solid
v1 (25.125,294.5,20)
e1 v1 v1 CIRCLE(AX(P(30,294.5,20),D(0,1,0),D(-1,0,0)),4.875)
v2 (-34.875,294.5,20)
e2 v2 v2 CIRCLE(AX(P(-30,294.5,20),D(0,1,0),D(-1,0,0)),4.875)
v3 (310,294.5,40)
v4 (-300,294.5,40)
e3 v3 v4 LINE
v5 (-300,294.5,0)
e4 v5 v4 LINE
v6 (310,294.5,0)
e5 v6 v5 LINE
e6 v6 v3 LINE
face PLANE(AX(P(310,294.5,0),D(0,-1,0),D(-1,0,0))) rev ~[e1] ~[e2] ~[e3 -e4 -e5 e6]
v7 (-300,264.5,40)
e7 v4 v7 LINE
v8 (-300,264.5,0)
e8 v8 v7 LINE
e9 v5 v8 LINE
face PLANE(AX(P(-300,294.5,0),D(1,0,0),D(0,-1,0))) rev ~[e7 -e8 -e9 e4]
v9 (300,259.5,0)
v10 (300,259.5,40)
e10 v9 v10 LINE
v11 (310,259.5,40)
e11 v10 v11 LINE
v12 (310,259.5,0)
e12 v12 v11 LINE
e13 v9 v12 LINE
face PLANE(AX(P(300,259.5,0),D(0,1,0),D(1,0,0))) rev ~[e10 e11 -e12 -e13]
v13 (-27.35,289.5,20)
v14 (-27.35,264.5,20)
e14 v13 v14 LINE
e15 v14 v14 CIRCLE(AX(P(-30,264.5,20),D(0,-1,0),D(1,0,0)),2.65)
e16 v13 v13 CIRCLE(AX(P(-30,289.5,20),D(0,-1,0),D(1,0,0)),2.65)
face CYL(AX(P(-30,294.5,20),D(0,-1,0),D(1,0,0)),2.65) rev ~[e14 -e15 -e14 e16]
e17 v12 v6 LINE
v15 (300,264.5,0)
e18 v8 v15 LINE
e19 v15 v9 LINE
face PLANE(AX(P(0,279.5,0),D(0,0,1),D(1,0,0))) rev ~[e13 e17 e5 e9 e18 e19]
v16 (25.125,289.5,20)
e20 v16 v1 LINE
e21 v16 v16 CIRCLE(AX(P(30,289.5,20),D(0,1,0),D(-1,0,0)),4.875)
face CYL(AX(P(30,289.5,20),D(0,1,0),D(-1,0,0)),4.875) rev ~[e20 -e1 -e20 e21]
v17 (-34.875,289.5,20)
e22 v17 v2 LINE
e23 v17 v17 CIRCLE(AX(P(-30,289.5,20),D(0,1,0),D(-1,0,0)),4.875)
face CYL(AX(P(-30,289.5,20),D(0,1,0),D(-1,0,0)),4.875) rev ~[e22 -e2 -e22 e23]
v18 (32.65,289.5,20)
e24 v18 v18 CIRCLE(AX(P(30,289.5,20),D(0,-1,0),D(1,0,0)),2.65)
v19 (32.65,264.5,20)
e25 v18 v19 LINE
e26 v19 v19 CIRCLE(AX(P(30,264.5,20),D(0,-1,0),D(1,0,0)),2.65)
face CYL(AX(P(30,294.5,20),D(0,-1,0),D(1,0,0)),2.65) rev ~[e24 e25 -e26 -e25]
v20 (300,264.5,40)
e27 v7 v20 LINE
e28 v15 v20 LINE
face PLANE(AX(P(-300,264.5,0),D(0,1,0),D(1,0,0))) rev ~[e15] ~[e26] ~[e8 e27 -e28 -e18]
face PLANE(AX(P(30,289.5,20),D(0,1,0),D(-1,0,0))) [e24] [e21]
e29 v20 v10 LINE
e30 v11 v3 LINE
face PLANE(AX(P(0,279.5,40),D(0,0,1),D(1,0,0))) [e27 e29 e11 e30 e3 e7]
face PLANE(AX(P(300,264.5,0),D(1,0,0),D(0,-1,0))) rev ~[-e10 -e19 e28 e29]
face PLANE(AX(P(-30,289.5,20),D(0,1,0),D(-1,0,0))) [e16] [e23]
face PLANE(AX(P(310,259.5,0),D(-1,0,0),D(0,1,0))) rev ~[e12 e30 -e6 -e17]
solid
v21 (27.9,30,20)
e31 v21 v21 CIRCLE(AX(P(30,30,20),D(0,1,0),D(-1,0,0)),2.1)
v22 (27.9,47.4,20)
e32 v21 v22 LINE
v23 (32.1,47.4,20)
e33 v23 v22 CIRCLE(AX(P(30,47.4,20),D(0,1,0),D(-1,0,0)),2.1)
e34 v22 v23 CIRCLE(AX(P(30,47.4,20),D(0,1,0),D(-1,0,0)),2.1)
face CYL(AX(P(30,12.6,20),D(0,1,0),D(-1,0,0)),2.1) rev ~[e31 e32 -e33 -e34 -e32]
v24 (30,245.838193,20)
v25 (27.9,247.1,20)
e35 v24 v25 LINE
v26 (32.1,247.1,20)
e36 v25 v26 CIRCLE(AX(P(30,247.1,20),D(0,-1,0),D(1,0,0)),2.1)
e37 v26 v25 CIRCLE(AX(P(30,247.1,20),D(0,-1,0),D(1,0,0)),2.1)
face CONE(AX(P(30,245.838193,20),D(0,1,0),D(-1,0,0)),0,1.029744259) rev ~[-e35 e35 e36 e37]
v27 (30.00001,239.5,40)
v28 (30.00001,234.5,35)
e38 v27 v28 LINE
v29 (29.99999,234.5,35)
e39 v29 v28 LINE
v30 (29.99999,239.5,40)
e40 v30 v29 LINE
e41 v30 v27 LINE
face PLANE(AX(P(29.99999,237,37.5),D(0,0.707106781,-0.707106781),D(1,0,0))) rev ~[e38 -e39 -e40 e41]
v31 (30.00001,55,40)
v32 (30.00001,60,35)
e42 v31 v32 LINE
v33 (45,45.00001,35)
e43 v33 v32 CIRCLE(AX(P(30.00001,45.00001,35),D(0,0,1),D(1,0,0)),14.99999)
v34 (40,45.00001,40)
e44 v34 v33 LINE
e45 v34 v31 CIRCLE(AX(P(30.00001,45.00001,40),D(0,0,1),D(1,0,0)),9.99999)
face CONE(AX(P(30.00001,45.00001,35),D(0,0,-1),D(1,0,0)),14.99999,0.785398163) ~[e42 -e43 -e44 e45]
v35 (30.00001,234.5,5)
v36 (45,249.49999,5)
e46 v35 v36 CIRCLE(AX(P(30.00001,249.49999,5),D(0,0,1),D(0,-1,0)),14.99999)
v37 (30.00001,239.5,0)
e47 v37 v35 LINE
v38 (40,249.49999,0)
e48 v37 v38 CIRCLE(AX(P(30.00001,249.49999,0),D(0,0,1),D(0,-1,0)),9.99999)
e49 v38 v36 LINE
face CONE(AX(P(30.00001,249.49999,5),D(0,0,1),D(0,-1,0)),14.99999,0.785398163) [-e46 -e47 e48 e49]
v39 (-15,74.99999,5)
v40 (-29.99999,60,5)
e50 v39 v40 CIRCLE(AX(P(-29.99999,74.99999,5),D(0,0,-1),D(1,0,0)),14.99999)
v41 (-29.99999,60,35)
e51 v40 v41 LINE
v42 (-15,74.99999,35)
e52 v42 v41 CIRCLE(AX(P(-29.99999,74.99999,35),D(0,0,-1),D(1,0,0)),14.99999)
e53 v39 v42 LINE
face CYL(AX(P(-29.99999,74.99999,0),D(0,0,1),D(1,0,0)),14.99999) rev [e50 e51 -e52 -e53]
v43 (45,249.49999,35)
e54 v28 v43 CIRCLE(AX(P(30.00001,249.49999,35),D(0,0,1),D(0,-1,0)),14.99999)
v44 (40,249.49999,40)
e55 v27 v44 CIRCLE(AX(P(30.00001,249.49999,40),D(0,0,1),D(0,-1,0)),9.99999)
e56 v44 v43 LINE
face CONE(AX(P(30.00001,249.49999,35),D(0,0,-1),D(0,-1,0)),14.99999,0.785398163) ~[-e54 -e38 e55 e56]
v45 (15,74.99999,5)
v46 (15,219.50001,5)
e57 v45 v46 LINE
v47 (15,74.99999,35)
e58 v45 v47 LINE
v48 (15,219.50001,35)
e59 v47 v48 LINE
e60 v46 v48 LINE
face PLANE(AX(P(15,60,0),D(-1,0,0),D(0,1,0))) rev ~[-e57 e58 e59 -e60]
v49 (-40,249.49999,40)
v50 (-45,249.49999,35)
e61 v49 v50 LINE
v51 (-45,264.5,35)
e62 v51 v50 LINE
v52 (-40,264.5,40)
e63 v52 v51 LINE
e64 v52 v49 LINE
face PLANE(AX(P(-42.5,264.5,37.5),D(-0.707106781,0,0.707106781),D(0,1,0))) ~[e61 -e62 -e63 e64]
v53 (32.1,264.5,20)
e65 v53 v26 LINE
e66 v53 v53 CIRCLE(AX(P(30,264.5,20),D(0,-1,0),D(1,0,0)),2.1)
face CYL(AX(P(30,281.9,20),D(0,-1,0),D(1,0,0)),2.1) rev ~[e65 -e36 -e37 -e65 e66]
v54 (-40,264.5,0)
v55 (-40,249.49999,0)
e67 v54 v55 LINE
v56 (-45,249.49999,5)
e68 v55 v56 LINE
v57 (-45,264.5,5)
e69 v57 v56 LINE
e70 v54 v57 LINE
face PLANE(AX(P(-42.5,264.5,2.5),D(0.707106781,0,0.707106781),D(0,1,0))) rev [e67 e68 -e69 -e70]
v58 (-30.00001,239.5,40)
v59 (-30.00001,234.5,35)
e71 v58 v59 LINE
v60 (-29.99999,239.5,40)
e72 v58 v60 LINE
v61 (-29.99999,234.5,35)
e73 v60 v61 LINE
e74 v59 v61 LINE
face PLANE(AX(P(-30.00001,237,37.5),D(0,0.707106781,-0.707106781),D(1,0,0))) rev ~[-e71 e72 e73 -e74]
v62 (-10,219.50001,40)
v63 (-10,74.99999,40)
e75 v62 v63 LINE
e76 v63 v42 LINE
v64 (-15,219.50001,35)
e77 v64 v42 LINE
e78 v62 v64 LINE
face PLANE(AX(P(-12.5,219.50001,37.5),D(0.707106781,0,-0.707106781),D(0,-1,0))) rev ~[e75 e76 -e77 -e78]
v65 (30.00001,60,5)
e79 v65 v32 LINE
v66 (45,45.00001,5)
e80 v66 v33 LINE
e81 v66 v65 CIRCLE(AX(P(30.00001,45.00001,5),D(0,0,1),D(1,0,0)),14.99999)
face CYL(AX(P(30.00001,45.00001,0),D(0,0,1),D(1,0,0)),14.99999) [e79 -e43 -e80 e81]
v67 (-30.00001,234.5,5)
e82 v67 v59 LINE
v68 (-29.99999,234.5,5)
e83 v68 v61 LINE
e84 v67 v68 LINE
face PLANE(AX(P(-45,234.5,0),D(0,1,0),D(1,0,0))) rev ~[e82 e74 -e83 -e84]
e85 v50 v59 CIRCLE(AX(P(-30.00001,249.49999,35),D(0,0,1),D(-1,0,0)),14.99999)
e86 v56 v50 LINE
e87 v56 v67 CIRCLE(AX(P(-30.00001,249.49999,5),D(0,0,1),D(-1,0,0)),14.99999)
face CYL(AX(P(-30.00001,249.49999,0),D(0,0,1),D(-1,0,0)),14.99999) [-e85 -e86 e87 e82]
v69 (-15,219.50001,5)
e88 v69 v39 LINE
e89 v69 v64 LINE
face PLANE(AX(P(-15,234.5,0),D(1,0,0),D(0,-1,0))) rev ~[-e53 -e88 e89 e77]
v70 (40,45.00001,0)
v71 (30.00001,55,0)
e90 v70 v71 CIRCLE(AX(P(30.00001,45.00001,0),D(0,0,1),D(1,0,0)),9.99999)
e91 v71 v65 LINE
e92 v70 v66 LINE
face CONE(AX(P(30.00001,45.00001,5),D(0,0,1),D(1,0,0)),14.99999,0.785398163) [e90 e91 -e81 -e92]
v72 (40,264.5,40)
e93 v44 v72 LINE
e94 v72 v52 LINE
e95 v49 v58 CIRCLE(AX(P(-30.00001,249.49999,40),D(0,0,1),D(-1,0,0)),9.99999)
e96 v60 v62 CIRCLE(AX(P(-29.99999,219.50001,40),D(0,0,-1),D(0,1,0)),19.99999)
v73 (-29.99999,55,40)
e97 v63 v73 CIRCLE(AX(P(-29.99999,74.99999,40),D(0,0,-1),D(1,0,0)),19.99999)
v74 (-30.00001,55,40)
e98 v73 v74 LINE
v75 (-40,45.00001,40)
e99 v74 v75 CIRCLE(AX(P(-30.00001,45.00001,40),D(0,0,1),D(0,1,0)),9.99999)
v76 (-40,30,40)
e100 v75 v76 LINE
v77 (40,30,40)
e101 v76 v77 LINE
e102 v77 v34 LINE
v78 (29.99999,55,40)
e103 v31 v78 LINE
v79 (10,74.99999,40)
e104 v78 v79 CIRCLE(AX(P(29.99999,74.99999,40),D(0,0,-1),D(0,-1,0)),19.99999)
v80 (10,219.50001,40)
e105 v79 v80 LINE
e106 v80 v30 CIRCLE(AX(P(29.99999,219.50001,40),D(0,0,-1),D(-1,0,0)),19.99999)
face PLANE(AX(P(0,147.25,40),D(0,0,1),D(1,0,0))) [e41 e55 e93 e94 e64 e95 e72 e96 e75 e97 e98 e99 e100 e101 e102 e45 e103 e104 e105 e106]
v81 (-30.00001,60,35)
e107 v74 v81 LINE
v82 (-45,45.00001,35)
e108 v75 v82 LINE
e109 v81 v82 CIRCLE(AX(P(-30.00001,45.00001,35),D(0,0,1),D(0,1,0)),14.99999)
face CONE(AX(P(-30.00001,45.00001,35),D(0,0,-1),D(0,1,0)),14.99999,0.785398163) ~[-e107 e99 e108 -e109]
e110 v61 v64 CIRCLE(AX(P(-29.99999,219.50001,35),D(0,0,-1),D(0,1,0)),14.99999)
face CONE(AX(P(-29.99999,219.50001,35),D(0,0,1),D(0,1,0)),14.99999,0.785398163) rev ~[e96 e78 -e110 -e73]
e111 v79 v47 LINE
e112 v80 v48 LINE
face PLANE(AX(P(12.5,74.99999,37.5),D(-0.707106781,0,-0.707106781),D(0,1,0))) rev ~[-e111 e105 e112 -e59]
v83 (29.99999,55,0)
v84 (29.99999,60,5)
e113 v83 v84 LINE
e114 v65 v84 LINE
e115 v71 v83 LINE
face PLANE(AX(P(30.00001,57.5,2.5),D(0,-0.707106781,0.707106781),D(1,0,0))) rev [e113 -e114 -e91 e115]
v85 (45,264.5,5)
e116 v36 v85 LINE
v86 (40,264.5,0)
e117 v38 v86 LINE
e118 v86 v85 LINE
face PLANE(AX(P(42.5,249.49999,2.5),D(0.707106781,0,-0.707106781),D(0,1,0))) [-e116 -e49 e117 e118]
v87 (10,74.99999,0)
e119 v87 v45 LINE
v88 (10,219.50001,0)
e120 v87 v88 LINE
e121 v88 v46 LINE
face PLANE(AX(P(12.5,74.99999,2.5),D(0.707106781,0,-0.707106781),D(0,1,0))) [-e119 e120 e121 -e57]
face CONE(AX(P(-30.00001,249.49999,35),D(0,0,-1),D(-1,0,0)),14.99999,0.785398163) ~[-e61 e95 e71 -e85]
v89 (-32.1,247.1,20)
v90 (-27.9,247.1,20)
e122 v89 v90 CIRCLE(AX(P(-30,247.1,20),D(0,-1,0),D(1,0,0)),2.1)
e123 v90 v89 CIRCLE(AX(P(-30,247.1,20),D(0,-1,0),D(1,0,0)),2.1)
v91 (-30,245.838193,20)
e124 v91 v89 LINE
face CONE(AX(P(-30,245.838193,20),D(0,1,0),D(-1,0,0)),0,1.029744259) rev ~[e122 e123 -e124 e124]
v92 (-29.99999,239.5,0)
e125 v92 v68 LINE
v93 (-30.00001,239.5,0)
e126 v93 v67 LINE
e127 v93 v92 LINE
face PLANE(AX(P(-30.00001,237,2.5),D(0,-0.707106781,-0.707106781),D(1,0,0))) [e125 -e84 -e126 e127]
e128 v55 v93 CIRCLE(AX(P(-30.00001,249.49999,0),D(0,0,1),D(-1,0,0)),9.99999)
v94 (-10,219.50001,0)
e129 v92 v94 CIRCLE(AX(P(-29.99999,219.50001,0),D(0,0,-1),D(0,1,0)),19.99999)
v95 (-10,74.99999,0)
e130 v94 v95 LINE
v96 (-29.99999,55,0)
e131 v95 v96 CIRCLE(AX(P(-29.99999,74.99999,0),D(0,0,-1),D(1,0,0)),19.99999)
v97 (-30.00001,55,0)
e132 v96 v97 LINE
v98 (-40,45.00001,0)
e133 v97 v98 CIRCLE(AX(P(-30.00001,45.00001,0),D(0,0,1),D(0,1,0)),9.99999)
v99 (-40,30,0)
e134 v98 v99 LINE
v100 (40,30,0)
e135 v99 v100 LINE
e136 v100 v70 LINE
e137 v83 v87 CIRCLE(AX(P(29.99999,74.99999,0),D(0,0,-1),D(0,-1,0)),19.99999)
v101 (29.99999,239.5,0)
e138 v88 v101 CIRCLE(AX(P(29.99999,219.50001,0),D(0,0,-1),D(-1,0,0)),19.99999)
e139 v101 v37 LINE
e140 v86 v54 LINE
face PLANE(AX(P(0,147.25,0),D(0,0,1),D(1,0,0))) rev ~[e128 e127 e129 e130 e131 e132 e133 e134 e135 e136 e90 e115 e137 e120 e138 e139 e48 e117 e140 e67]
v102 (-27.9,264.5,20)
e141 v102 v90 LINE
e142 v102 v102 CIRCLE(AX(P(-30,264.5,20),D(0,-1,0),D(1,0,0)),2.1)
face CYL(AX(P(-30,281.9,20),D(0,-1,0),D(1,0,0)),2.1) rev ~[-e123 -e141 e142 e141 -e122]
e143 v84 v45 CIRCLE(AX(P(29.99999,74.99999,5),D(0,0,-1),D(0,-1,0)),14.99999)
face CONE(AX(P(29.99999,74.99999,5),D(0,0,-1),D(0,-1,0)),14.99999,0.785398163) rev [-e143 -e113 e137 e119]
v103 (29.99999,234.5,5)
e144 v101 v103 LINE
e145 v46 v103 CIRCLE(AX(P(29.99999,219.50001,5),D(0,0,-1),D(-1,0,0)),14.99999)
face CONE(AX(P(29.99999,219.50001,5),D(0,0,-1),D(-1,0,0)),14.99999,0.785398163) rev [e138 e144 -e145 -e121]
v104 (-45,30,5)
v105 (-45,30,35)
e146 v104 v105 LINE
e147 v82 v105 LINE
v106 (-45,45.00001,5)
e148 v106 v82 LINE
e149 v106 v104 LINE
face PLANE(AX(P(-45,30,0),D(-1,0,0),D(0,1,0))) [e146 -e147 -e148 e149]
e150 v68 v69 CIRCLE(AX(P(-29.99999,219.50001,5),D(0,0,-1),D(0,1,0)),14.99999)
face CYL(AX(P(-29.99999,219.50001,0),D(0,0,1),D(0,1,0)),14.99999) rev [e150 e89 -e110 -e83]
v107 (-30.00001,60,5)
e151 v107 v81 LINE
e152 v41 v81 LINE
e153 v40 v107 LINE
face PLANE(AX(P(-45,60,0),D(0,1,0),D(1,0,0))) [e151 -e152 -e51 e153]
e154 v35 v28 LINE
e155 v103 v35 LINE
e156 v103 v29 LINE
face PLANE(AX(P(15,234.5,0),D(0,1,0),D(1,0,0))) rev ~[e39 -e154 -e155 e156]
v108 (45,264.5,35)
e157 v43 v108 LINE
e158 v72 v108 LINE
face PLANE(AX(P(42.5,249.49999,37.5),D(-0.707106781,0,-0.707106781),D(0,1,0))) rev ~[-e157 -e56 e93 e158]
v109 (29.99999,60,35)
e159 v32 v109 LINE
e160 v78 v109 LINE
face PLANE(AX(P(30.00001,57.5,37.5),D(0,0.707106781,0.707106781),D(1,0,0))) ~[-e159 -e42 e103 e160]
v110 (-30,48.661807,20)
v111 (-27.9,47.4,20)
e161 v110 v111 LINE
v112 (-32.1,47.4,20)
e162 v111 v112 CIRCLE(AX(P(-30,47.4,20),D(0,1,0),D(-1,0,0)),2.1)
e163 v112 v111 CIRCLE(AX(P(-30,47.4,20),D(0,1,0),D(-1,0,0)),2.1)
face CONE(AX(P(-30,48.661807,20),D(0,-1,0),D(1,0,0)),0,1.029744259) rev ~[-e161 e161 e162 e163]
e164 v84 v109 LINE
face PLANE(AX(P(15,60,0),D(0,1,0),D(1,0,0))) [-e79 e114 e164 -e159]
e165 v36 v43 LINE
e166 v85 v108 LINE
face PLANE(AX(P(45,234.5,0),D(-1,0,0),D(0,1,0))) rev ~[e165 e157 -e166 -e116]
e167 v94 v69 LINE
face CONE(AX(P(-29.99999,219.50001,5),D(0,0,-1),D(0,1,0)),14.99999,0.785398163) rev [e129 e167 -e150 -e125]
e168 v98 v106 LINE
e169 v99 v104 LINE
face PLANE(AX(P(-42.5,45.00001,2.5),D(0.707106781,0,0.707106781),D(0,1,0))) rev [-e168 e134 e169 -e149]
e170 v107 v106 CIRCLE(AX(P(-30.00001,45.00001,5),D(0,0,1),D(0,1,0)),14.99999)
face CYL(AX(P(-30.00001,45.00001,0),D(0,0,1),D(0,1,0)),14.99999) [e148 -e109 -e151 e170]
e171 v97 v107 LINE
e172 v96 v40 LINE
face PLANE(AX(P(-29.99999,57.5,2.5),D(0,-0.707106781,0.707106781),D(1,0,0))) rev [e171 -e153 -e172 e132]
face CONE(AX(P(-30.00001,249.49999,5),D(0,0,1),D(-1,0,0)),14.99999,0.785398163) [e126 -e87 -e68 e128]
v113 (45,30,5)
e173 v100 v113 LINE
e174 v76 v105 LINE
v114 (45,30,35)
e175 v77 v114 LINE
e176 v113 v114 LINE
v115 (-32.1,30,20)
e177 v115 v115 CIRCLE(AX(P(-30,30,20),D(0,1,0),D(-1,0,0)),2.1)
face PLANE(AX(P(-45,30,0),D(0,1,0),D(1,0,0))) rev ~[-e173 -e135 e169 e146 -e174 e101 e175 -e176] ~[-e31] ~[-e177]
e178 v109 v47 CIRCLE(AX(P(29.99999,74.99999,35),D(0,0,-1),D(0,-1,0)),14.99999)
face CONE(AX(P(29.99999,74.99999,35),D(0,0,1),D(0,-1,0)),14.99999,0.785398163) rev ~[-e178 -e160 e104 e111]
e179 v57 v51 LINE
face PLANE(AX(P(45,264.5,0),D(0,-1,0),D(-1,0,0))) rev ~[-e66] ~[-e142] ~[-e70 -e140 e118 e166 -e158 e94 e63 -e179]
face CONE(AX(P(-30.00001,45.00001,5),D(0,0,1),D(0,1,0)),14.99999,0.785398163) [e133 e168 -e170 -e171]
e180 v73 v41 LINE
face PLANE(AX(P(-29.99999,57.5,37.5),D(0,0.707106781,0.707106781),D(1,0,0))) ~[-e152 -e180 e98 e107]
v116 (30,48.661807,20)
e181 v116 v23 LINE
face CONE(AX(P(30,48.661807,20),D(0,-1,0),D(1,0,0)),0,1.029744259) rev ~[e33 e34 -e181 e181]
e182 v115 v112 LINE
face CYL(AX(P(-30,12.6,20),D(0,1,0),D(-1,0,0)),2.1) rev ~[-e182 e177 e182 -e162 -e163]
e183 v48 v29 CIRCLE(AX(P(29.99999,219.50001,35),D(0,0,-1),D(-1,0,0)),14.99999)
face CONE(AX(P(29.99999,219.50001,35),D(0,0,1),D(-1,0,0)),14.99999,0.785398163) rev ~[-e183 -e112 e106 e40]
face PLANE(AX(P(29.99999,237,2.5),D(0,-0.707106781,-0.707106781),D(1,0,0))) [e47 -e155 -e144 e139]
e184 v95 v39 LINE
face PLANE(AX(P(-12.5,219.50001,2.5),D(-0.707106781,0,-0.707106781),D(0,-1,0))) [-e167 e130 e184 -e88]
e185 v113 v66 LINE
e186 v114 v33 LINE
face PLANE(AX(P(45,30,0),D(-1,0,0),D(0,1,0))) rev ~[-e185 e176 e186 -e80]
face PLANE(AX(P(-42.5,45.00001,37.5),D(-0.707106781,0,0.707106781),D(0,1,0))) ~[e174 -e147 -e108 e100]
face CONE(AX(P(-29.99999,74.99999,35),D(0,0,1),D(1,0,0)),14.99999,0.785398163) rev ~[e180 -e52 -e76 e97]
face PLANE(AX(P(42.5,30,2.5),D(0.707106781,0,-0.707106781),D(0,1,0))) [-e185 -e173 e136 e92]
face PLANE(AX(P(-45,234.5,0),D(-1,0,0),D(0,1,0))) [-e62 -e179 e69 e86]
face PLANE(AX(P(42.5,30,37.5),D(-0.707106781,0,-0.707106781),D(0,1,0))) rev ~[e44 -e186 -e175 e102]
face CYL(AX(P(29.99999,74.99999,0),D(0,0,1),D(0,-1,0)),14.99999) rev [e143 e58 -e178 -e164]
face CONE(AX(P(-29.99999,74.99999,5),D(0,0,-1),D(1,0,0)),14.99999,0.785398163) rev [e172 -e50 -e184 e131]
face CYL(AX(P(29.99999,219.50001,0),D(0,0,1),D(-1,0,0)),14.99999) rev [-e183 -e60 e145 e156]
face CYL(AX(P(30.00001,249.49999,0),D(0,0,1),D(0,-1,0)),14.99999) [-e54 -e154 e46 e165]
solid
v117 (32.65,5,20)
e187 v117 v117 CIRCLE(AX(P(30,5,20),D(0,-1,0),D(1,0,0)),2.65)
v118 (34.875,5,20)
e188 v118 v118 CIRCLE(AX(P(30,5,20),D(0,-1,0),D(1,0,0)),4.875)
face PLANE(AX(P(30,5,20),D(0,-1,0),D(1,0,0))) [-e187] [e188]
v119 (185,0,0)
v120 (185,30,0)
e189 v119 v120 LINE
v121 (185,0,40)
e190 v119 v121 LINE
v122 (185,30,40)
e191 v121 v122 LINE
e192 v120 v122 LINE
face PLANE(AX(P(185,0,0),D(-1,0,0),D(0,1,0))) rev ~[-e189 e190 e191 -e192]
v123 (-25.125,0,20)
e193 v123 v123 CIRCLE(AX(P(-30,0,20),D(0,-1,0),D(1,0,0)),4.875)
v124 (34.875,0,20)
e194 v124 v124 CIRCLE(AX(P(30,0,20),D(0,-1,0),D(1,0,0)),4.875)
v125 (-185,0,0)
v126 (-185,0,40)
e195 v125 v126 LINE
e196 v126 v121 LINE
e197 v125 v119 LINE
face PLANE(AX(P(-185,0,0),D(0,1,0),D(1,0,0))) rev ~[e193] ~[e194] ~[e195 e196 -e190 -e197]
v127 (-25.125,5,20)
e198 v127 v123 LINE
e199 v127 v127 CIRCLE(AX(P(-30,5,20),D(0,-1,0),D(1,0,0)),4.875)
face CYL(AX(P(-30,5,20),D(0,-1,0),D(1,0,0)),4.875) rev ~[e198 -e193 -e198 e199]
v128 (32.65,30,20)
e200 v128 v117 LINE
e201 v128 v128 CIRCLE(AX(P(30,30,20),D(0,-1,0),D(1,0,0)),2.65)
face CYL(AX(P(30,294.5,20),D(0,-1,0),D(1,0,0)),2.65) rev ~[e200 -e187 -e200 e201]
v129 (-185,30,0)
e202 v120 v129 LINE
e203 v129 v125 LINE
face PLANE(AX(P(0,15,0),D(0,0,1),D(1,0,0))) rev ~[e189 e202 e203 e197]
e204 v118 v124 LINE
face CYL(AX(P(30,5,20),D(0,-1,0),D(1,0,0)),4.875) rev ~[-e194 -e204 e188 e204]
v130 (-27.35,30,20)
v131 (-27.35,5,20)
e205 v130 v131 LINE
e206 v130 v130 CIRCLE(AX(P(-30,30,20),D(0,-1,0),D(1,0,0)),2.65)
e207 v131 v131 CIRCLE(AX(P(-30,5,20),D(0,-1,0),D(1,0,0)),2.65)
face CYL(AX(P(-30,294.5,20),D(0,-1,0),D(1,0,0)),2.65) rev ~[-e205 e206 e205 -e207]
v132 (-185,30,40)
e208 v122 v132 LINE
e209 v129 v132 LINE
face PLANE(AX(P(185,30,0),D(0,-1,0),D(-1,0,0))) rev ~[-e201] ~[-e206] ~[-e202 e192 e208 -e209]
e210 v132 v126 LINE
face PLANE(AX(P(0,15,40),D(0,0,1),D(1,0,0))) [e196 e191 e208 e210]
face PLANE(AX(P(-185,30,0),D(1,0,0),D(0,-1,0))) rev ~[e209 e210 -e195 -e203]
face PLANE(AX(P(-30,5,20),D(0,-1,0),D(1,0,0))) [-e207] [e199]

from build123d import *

# Parameters (mm, degrees)
F1_DEPTH             = 40
F0_W                 = 30
F0_H                 = 30
F2_DEPTH             = 40
F3_DEPTH             = 40
F4_R                 = 14.99999
F5_SIZE              = 5
F8_D                 = 5.3
F8_CBORE_D           = 9.75
F8_CBORE_DEPTH       = 5
F8_2_D               = 5.3
F8_2_CBORE_D         = 9.75
F8_2_CBORE_DEPTH     = 5
F8_ON_F7_D           = 5.3
F8_ON_F7_CBORE_D     = 9.75
F8_ON_F7_CBORE_DEPTH = 5
F9_D                 = 4.2
F9_DEPTH             = 17.4
F9_START             = 30
F9_TIP               = 1.2618073
F9_ON_F7_D           = 4.2
F9_ON_F7_DEPTH       = 17.4
F9_ON_F7_START       = 30
F9_ON_F7_TIP         = 1.2618073


# Not quite as in the source:
# - a fillet or chamfer is up to 0.001 mm smaller than in the source, because OpenCascade refuses the exact size


with BuildPart() as f1:
    # F0 (on Top) → F1 (new body)
    with BuildSketch(Plane.XY):
        Polygon((300, 294.5), (-300, 294.5), (-300, 264.5), (-45, 264.5), (-15, 264.5), (15, 264.5), (45, 264.5), (300, 264.5), align=None)
        Polygon((310, 294.5), (300, 294.5), (300, 264.5), (300, 259.5), (310, 259.5), align=None)
    extrude(amount=F1_DEPTH)

    # F8 (through all)
    with Locations(Plane(origin=(0, 294.5, 0), x_dir=(-1, 0, 0), z_dir=(0, 1, 0))):
        with Locations((-30, 20), (30, 20)):
            CounterBoreHole(F8_D / 2, F8_CBORE_D / 2, F8_CBORE_DEPTH)


with BuildPart() as f2:
    # F0 (on Top) → F2 (new body)
    with BuildSketch(Plane.XY):
        Polygon((15, 264.5), (-15, 264.5), (-15, 234.5), (-15, 60), (-15, 30), (15, 30), (15, 60), (15, 234.5), align=None)
        with Locations((-30, 249.5)):
            Rectangle(F0_W, F0_H)
        with Locations((30, 249.5)):
            Rectangle(F0_W, F0_H)
        with Locations((-30, 45)):
            Rectangle(F0_W, F0_H)
        with Locations((30, 45)):
            Rectangle(F0_W, F0_H)
    extrude(amount=F2_DEPTH)

    # F4 (radius 15 in the source; OpenCascade refuses exactly that, so slightly less here)
    f4_edges = [f2.edges().sort_by_distance(p)[0] for p in [
        (45, 234.5, 20),
        (-45, 234.5, 20),
        (-45, 60, 20),
        (45, 60, 20),
        (15, 234.5, 20),
        (-15, 234.5, 20),
        (-15, 60, 20),
        (15, 60, 20),
    ]]
    fillet(f4_edges, radius=F4_R)

    # F5
    f5_edges = [f2.edges().sort_by_distance(p)[0] for p in [
        (-15, 147.25, 40),
        (15, 147.25, 40),
        (-15, 147.25, 0),
        (15, 147.25, 0),
    ]]
    chamfer(f5_edges, length=F5_SIZE)

    # F9
    # its depths count from where the whole tool has entered the part; down to there all is cleared
    with Locations(Plane(origin=(0, 294.5, 0), x_dir=(-1, 0, 0), z_dir=(0, 1, 0))):
        with Locations((30, 20), (-30, 20)):
            Hole(F9_D / 2, depth=F9_START)
    with Locations(Plane(origin=(0, 294.5, 0), x_dir=(-1, 0, 0), z_dir=(0, 1, 0)).offset(-F9_START)):
        with Locations((30, 20), (-30, 20)):
            Hole(F9_D / 2, depth=F9_DEPTH)
            with Locations((0, 0, -(F9_DEPTH + F9_TIP / 2))):  # 118° drill point
                Cone(0, F9_D / 2, F9_TIP, mode=Mode.SUBTRACT)

    # F9 on F7
    # its depths count from where the whole tool has entered the part; down to there all is cleared
    with Locations(Plane.XZ):
        with Locations((-30, 20), (30, 20)):
            Hole(F9_ON_F7_D / 2, depth=F9_ON_F7_START)
    with Locations(Plane.XZ.offset(-F9_ON_F7_START)):
        with Locations((-30, 20), (30, 20)):
            Hole(F9_ON_F7_D / 2, depth=F9_ON_F7_DEPTH)
            with Locations((0, 0, -(F9_ON_F7_DEPTH + F9_ON_F7_TIP / 2))):  # 118° drill point
                Cone(0, F9_ON_F7_D / 2, F9_ON_F7_TIP, mode=Mode.SUBTRACT)


with BuildPart() as f3:
    # F0 (on Top) → F3 (new body)
    with BuildSketch(Plane.XY):
        Polygon((15, 30), (-15, 30), (-45, 30), (-185, 30), (-185, 0), (185, 0), (185, 30), (45, 30), align=None)
    extrude(amount=F3_DEPTH)

    # F8#2 (through all)
    with Locations(Plane(origin=(0, 294.5, 0), x_dir=(-1, 0, 0), z_dir=(0, 1, 0))):
        with Locations((-30, 20), (30, 20)):
            CounterBoreHole(F8_2_D / 2, F8_2_CBORE_D / 2, F8_2_CBORE_DEPTH)

    # F8 on F7 (through all)
    with Locations(Plane.XZ):
        with Locations((-30, 20), (30, 20)):
            CounterBoreHole(F8_ON_F7_D / 2, F8_ON_F7_CBORE_D / 2, F8_ON_F7_CBORE_DEPTH)


solid = Compound([f1.part, f2.part, f3.part])
